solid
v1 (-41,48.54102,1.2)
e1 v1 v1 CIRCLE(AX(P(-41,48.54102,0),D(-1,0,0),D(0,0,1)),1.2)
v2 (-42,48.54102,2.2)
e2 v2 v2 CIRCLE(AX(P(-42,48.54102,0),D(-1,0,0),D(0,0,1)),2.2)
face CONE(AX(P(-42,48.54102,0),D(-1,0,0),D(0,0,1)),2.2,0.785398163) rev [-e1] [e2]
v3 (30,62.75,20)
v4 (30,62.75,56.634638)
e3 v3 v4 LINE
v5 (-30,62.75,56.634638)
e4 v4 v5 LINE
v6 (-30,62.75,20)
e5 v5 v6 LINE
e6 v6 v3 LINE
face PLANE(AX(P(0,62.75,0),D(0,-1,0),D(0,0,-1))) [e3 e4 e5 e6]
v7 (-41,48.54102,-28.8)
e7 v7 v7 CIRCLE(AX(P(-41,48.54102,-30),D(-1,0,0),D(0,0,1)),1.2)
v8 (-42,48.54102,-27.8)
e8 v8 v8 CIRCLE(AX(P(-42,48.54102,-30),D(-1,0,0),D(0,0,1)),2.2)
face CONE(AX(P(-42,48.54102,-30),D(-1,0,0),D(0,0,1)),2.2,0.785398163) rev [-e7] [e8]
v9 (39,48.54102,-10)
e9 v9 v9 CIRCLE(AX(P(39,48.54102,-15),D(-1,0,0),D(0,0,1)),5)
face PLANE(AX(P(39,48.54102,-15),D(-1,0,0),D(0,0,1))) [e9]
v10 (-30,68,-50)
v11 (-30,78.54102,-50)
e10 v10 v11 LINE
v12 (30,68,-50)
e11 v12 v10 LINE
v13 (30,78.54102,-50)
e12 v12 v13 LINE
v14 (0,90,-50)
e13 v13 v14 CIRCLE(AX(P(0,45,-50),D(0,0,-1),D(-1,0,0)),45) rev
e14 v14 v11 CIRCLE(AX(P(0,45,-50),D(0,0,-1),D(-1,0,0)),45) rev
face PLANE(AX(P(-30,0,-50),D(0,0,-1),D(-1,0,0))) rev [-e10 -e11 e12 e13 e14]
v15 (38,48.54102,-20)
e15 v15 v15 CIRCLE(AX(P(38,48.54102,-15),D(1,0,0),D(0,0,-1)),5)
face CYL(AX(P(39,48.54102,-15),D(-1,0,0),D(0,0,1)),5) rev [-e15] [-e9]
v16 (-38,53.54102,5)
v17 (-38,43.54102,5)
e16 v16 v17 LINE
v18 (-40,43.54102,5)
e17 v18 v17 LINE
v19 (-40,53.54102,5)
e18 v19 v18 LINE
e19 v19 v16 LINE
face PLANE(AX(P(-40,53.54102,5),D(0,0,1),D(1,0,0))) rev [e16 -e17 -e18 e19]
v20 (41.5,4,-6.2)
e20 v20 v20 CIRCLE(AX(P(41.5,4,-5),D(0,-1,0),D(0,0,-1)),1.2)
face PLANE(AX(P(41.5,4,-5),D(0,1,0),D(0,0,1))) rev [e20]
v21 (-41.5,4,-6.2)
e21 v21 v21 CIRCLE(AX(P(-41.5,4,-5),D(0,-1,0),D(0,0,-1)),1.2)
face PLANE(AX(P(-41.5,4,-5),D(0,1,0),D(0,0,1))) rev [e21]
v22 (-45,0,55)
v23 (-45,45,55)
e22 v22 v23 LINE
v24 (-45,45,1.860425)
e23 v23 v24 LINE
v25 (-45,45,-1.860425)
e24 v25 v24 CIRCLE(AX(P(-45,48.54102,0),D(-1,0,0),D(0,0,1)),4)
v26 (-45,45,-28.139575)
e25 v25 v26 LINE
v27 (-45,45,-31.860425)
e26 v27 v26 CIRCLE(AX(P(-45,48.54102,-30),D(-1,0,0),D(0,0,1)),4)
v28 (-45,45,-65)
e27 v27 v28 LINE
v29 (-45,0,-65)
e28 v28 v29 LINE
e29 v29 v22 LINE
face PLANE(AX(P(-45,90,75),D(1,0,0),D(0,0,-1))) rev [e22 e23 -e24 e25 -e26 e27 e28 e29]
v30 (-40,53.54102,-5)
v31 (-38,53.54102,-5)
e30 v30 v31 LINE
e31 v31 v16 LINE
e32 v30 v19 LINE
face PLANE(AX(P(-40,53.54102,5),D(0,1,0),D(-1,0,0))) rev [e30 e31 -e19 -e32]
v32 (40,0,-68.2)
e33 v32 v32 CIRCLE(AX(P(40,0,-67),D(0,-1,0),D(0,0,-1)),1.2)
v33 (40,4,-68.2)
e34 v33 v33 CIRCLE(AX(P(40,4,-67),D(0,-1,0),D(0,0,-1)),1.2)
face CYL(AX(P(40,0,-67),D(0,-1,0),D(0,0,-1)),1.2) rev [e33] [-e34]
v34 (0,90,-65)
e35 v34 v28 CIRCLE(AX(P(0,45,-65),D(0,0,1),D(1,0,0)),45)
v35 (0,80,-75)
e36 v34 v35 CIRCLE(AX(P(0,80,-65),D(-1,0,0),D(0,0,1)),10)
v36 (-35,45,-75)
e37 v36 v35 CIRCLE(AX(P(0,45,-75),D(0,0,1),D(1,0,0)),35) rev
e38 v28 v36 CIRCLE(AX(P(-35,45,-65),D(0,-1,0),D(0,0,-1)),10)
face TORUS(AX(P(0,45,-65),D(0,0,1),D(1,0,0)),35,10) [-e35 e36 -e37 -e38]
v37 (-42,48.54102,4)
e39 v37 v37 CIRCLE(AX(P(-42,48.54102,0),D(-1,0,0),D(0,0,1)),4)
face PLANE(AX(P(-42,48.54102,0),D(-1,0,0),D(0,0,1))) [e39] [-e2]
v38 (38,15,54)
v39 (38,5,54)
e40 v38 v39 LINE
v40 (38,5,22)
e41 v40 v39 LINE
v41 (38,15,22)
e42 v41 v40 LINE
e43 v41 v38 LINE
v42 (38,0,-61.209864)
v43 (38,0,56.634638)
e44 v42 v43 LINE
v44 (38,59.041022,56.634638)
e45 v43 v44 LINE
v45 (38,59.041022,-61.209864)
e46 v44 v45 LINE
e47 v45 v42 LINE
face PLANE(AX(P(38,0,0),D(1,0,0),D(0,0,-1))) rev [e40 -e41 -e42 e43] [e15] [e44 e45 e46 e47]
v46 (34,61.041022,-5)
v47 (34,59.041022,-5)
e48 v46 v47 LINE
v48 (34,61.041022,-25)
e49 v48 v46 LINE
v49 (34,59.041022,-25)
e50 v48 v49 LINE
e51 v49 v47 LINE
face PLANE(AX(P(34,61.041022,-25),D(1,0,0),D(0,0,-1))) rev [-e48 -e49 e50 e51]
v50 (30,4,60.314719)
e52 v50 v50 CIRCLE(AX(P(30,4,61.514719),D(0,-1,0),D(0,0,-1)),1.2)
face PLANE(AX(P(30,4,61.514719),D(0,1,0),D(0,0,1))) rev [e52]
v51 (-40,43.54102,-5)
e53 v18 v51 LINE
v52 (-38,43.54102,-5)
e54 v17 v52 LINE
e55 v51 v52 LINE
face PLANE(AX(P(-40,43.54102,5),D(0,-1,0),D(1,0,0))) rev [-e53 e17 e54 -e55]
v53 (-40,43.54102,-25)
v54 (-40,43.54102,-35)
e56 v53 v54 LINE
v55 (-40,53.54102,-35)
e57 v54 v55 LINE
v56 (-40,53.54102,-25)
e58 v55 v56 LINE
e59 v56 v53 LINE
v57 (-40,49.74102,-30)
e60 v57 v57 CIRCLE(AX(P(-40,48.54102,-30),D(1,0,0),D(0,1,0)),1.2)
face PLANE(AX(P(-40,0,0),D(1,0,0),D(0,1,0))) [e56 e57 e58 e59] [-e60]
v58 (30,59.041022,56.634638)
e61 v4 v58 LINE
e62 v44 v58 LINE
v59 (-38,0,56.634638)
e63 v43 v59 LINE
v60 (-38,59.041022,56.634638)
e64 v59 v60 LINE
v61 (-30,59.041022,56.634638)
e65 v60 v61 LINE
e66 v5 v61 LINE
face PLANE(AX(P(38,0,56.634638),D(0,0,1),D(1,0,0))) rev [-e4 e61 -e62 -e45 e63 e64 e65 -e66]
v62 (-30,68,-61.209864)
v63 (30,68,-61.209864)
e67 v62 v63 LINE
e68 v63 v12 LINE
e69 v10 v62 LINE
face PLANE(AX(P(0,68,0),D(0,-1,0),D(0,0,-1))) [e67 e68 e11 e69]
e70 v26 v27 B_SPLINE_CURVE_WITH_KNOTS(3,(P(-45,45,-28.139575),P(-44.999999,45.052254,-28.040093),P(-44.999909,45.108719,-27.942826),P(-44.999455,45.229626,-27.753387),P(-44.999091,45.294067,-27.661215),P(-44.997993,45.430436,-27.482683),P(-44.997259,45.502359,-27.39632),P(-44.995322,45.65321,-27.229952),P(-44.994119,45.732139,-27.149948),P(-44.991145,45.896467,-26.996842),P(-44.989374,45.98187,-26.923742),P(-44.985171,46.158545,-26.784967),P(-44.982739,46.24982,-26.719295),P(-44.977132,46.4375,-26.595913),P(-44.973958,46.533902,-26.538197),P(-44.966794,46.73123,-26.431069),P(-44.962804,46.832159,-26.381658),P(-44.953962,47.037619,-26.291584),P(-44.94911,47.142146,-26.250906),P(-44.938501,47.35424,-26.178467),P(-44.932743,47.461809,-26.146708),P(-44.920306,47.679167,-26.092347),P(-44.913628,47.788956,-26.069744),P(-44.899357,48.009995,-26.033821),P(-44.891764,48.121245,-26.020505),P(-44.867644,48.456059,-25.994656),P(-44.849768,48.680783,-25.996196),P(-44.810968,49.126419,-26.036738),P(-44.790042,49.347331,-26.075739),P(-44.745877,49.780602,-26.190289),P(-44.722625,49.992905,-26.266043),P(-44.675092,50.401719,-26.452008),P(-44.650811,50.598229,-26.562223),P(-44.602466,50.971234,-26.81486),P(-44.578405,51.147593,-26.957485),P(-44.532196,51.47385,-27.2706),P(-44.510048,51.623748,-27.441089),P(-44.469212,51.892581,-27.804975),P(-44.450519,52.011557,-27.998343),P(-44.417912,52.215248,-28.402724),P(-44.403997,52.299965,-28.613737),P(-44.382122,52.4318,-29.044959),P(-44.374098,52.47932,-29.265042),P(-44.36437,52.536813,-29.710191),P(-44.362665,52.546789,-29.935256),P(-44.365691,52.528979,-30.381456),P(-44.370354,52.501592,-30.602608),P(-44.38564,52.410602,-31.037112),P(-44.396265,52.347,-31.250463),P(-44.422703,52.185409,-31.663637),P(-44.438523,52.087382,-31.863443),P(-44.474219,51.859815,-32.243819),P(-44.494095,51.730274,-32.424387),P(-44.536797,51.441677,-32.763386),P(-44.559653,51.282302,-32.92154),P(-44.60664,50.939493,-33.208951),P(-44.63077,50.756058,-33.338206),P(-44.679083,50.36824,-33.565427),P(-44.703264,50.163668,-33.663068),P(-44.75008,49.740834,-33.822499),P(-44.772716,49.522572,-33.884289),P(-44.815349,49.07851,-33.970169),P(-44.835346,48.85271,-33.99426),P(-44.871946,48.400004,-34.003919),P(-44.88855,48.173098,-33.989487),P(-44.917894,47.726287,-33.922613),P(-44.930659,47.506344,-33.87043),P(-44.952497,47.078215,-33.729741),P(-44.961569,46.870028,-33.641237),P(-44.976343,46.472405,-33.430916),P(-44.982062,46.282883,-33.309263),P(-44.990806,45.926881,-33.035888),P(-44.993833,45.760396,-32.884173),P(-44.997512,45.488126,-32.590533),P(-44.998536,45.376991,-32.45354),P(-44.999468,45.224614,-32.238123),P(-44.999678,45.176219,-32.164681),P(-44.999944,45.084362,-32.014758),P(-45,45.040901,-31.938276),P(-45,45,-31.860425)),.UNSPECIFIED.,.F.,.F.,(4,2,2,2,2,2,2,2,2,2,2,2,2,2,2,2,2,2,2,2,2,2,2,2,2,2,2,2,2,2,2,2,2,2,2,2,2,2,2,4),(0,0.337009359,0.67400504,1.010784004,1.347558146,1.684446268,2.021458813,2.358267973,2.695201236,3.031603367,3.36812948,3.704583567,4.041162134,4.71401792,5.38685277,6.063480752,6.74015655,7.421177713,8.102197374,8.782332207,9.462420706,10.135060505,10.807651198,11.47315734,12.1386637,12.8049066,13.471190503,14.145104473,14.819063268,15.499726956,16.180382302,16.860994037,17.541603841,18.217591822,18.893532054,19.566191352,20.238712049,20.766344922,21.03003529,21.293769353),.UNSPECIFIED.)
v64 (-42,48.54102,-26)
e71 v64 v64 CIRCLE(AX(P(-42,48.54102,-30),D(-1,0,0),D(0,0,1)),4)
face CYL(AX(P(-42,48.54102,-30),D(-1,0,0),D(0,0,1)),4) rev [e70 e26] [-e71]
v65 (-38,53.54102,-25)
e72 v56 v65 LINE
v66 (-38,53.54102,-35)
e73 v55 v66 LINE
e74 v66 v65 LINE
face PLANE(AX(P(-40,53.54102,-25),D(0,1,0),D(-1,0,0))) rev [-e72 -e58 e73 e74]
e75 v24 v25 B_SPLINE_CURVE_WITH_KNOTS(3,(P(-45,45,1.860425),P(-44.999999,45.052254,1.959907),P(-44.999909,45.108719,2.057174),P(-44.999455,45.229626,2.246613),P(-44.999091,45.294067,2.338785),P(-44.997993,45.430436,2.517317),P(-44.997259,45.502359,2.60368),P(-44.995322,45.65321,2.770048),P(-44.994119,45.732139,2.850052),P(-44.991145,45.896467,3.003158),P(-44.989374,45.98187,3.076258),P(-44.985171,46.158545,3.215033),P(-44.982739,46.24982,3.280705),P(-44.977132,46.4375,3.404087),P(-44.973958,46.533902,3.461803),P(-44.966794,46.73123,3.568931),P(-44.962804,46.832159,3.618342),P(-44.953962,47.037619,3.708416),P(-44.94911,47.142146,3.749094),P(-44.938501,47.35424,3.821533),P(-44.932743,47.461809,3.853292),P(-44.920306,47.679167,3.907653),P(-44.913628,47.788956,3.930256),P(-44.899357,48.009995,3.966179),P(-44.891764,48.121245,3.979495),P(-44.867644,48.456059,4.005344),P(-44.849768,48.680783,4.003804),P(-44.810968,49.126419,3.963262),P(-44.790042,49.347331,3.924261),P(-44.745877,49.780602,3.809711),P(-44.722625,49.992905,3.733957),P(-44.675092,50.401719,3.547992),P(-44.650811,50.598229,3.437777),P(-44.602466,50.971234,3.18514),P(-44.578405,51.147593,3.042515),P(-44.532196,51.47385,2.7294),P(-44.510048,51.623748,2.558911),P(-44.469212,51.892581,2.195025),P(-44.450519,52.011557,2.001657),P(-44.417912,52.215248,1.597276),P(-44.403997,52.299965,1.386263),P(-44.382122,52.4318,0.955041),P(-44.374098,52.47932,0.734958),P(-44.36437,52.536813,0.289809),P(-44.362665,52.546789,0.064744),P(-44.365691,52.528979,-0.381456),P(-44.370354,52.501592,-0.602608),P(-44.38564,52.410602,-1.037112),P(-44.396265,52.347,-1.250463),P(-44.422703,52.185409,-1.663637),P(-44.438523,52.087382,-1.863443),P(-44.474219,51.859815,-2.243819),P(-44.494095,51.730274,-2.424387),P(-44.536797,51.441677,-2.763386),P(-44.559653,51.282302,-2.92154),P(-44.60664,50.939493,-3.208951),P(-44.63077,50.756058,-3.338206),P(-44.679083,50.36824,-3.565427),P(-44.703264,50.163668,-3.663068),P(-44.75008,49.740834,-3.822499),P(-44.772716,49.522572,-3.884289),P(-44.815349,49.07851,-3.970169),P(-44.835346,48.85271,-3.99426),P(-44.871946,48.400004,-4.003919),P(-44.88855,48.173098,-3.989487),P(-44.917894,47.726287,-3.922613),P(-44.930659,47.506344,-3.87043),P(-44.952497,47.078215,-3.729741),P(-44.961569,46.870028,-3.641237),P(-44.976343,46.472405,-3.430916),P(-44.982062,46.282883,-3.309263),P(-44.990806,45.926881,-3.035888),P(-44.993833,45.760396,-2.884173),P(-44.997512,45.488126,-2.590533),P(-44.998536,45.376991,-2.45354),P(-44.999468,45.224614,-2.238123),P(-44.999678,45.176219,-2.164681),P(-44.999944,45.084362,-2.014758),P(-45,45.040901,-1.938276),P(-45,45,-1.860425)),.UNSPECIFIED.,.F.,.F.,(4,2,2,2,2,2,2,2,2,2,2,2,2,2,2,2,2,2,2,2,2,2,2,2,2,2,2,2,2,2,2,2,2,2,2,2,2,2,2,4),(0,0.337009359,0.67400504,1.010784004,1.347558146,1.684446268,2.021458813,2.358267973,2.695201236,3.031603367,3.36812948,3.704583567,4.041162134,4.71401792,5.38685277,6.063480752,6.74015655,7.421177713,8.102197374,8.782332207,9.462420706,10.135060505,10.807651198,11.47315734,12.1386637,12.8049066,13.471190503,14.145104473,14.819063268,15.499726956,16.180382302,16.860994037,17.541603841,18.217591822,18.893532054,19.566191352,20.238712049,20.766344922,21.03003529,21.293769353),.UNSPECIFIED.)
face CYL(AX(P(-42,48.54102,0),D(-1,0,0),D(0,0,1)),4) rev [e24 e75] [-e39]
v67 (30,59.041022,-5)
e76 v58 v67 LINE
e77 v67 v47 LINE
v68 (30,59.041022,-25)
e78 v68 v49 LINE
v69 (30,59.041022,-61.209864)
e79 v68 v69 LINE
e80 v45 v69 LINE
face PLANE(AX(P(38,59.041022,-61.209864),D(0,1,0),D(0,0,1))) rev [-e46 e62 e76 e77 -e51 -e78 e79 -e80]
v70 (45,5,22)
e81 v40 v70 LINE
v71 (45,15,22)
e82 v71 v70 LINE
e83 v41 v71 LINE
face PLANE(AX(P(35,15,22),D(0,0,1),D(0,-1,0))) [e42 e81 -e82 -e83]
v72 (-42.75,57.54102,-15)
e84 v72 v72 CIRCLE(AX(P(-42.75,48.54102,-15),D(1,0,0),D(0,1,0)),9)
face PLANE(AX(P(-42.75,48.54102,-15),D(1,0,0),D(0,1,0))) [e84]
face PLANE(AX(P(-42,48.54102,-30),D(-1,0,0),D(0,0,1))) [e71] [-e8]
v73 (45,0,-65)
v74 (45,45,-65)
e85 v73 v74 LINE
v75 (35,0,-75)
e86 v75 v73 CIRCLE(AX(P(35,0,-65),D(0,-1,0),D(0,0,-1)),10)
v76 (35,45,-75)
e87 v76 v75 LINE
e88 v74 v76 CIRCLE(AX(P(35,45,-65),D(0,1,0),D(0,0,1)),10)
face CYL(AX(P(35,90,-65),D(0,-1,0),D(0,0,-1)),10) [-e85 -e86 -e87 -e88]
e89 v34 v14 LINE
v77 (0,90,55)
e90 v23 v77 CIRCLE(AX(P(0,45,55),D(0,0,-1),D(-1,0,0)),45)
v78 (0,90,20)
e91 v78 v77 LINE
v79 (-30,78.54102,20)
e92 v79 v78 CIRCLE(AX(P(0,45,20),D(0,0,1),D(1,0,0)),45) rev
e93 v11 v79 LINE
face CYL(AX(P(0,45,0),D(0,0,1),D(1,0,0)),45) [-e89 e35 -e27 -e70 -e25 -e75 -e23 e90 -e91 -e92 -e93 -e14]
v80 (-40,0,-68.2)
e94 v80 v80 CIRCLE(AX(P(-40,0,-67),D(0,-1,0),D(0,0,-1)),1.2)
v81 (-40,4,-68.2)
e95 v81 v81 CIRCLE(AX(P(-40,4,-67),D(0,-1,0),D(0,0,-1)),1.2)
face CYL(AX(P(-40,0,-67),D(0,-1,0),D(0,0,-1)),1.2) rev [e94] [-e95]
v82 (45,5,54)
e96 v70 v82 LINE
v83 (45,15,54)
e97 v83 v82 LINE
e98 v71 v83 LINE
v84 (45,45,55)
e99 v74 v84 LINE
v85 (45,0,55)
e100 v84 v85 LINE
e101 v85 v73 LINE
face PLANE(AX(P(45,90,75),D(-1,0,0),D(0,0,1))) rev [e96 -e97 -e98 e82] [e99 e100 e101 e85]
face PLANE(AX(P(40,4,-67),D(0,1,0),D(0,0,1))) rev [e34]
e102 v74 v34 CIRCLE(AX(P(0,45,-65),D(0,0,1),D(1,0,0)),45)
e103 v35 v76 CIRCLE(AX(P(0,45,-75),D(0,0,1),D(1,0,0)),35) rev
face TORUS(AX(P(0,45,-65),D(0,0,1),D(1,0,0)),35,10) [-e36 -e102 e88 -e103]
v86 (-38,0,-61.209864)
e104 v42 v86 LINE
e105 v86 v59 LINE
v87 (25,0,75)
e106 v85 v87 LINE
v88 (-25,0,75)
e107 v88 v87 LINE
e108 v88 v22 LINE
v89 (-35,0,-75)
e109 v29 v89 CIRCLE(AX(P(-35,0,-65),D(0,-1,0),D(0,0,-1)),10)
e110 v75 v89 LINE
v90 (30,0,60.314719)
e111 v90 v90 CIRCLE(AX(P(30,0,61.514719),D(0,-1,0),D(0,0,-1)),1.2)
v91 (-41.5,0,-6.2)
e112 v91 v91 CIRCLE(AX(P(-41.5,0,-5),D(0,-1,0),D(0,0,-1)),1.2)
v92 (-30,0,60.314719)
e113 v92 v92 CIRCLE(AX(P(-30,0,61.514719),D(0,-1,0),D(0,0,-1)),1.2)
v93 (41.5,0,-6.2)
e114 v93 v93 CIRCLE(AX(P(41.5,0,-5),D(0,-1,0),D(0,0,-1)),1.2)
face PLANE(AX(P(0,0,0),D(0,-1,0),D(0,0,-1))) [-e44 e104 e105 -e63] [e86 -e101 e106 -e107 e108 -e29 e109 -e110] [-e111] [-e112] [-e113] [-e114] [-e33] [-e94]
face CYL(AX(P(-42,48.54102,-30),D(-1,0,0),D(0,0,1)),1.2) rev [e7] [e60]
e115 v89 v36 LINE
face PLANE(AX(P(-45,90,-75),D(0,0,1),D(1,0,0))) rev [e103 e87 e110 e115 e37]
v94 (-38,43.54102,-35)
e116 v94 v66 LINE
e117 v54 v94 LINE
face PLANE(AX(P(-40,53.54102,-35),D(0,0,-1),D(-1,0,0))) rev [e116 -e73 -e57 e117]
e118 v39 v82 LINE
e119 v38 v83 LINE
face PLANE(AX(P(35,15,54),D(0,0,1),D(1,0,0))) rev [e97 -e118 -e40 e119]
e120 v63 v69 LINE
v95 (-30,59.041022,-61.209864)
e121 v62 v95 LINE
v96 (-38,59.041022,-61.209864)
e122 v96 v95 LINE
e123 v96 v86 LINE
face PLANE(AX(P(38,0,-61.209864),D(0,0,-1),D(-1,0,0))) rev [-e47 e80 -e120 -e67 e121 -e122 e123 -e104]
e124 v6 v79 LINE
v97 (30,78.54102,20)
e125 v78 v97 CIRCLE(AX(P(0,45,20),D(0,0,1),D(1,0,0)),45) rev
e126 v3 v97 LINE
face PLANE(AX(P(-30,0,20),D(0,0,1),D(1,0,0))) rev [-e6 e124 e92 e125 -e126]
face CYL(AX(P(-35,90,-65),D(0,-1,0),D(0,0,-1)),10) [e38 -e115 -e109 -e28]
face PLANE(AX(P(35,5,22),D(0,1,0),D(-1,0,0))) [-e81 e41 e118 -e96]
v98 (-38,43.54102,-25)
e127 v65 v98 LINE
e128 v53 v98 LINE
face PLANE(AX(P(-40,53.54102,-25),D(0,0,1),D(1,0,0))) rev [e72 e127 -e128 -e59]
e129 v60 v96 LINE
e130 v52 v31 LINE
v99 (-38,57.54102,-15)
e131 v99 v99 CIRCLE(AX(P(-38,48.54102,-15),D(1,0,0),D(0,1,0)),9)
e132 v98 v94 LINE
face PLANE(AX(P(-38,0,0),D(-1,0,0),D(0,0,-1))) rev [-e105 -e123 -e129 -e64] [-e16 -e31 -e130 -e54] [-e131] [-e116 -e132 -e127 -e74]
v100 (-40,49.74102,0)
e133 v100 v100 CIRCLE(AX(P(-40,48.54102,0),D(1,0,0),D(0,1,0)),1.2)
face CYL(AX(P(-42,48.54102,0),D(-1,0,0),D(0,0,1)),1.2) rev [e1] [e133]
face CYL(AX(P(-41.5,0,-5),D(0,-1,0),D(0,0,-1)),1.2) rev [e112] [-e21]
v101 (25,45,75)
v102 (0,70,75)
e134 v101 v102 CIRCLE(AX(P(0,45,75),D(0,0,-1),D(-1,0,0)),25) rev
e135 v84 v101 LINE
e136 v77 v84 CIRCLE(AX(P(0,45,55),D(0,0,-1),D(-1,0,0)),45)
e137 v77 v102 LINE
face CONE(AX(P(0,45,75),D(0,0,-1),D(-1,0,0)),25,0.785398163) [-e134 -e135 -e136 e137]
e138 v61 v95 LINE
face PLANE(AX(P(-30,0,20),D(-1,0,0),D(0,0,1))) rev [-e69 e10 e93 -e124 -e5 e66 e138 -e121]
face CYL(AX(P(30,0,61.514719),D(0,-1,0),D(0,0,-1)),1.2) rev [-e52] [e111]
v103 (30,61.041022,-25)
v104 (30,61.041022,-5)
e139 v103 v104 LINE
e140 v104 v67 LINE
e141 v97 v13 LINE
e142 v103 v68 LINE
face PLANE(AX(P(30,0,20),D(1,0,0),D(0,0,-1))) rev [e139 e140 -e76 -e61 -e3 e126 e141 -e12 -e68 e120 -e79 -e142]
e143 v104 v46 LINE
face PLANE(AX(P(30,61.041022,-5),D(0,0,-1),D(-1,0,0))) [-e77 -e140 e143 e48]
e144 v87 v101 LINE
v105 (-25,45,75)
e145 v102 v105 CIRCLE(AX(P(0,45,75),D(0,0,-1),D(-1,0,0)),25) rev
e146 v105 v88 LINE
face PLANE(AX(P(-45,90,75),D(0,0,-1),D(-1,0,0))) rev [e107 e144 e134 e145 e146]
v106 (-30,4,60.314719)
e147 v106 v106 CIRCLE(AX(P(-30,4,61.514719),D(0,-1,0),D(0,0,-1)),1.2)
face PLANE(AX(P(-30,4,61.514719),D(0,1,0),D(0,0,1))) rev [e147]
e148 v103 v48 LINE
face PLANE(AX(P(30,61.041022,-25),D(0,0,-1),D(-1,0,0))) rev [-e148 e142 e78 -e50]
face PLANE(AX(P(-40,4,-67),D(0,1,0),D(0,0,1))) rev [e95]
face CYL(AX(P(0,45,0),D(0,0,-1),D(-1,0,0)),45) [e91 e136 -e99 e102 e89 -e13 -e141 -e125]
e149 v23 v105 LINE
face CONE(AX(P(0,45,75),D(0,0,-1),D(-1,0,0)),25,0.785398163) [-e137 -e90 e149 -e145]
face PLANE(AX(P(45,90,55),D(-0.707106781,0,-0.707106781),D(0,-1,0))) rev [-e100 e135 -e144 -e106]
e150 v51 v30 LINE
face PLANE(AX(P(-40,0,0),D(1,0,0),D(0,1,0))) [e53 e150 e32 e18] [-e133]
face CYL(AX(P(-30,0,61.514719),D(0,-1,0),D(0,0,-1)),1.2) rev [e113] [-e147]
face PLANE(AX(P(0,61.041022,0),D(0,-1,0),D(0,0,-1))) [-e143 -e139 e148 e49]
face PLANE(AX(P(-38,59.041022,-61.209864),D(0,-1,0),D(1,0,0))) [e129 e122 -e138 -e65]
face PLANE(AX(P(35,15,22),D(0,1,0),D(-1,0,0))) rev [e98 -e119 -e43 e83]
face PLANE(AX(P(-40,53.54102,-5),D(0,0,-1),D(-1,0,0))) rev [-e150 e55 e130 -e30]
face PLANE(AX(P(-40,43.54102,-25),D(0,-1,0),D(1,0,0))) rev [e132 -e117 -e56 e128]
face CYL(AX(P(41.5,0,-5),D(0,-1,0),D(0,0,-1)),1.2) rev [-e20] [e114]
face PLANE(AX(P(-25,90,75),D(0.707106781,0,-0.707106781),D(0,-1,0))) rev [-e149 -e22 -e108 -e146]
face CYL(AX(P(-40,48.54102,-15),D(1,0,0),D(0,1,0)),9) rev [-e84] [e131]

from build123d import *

# Parameters (mm, degrees)
SCHIZZO1_W                             = 90
SCHIZZO1_H                             = 150
ESTRUSIONE_ESTRUSIONE1_DEPTH           = 90
SCHIZZO4_W                             = 60
SCHIZZO4_H                             = 70
TAGLIO_ESTRUSIONE2_DEPTH               = 90
RACCORDO5_R                            = 45
RACCORDO6_R                            = 45
SMUSSO2_SIZE                           = 20
SCHIZZO7_W                             = 50
SCHIZZO7_H                             = 44.753189799
ESTRUSIONE_ESTRUSIONE2_DEPTH           = 50
SMUSSO3_SIZE                           = 20
SMUSSO3_SIZE2                          = 34.641016151
RACCORDO7_R                            = 10
RACCORDO8_R                            = 10
SCHIZZO9_W                             = 50
SCHIZZO9_H                             = 50
ESTRUSIONE_ESTRUSIONE3_DEPTH           = 5
RACCORDO9_R                            = 10
SCHIZZO13_W                            = 45
SCHIZZO13_H                            = 38.415996799
TAGLIO_ESTRUSIONE3_DEPTH               = 79.978264331
SCHIZZO14_W                            = 117.844501366
SCHIZZO14_H                            = 59.041021869
TAGLIO_ESTRUSIONE4_DEPTH               = 8
SCHIZZO18_R                            = 5
TAGLIO_ESTRUSIONE5_DEPTH               = 9
SCHIZZO16_W                            = 4
SCHIZZO16_H                            = 20
TAGLIO_ESTRUSIONE7_DEPTH               = 2
SCHIZZO23_W                            = 76
SCHIZZO23_H                            = 117.844501366
TAGLIO_ESTRUSIONE8_DEPTH               = 38
FORO_PER_VITE_M2_2_D                   = 2.4
FORO_PER_VITE_M2_2_DEPTH               = 4
FORO_PER_VITE_M4_1_D                   = 4.5
FORO_PER_VITE_M4_1_DEPTH               = 10
SCHIZZO29_W                            = 60
SCHIZZO29_H                            = 11.209863528
TAGLIO_ESTRUSIONE9_DEPTH               = 30
SCHIZZO36_W                            = 46.07976418
SCHIZZO36_H                            = 28.262497783
TAGLIO_ESTRUSIONE12_DEPTH              = 28
ESTRUSIONE_ESTRUSIONE4_REACH           = 170.388
SCHIZZO38_R                            = 6
SCHIZZO38_R_2                          = 2.5
TAGLIO_ESTRUSIONE13_DEPTH              = 28
SCHIZZO39_R                            = 9
SCHIZZO39_W                            = 10
SCHIZZO39_H                            = 10
TAGLIO_ESTRUSIONE14_DEPTH              = 2
SCHIZZO40_W                            = 32
SCHIZZO40_H                            = 10
TAGLIO_ESTRUSIONE15_DEPTH              = 10
SCHIZZO42_R                            = 4
TAGLIO_ESTRUSIONE16_DEPTH              = 3
FORO_SVASATO_PER_VITE_M2_3_D           = 2.4
FORO_SVASATO_PER_VITE_M2_3_DEPTH       = 6
FORO_SVASATO_PER_VITE_M2_3_CSINK_D     = 4.4
FORO_SVASATO_PER_VITE_M2_3_CSINK_ANGLE = 90
FORO_SVASATO_PER_VITE_M2_3_TIP         = 0.721032743
SCHIZZO53_R                            = 9
TAGLIO_ESTRUSIONE19_DEPTH              = 2.75
SCHIZZO54_W                            = 60
SCHIZZO54_H                            = 36.634637838
TAGLIO_ESTRUSIONE20_DEPTH              = 24.75
SCHIZZO55_W                            = 50
SCHIZZO55_H                            = 69.198351347
TAGLIO_ESTRUSIONE21_DEPTH              = 66
SCHIZZO57_W                            = 18.365362162
SCHIZZO57_H                            = 38.415996799
ESTRUSIONE_ESTRUSIONE5_DEPTH           = 47
SCHIZZO58_W                            = 7
SCHIZZO58_H                            = 32
ESTRUSIONE_ESTRUSIONE6_DEPTH           = 11


with BuildPart() as part:
    # Schizzo1 → Estrusione-Estrusione1 (new body)
    with BuildSketch(Plane(origin=(0, 0, 0), x_dir=(1, 0, 0), z_dir=(0, 1, 0))):
        Rectangle(SCHIZZO1_W, SCHIZZO1_H)
    extrude(amount=ESTRUSIONE_ESTRUSIONE1_DEPTH)

    # Schizzo4 → Taglio-Estrusione2 (cut)
    with BuildSketch(Plane(origin=(0, 90, 0), x_dir=(1, 0, 0), z_dir=(0, 1, 0))):
        with Locations((0, 15)):
            Rectangle(SCHIZZO4_W, SCHIZZO4_H)
    extrude(amount=-TAGLIO_ESTRUSIONE2_DEPTH, mode=Mode.SUBTRACT)

    # Raccordo5
    # the kernel refuses this fillet: 45 mm, written as the material it takes off along each edge
    with BuildSketch(Plane(origin=(-45, 90, -187.5), x_dir=(0, -1, 0), z_dir=(0, 0, 1))) as raccordo5_piece_1:
        with BuildLine():
            CenterArc((RACCORDO5_R, RACCORDO5_R), RACCORDO5_R, 180, 90)
            Line((0, RACCORDO5_R), (0, 0))
            Line((0, 0), (RACCORDO5_R, 0))
        make_face()
    extrude(amount=375, mode=Mode.SUBTRACT)

    # Raccordo6
    # the kernel refuses this fillet: 45 mm, written as the material it takes off along each edge
    with BuildSketch(Plane(origin=(45, 90, 187.5), x_dir=(0, -1, 0), z_dir=(0, 0, -1))) as raccordo6_piece_1:
        with BuildLine():
            CenterArc((RACCORDO6_R, RACCORDO6_R), RACCORDO6_R, 180, 90)
            Line((0, RACCORDO6_R), (0, 0))
            Line((0, 0), (RACCORDO6_R, 0))
        make_face()
    extrude(amount=375, mode=Mode.SUBTRACT)

    # Smusso2
    smusso2_edges = [part.edges().sort_by_distance(p)[0] for p in [
        (-45, 22.5, 75),
        (0, 90, 75),
        (45, 22.5, 75),
        (0, 90, 75),
    ]]
    chamfer(smusso2_edges, length=SMUSSO2_SIZE)

    # Schizzo7 → Estrusione-Estrusione2 (add)
    with BuildSketch(Plane.XY.offset(75)):
        with Locations((0, 22.3765949)):
            Rectangle(SCHIZZO7_W, SCHIZZO7_H)
    extrude(amount=ESTRUSIONE_ESTRUSIONE2_DEPTH)

    # Smusso3
    smusso3_edges = [part.edges().sort_by_distance(p)[0] for p in [
        (0, 44.753189799, 125),
    ]]
    smusso3_side = [part.faces().sort_by_distance(p)[0] for p in [
        (0, 44.753189799, 100),
    ]]
    chamfer(smusso3_edges, length=SMUSSO3_SIZE, length2=SMUSSO3_SIZE2, reference=smusso3_side[0])

    # Raccordo7
    raccordo7_edges = [part.edges().sort_by_distance(p)[0] for p in [
        (0, 44.753189799, 105),
    ]]
    fillet(raccordo7_edges, radius=RACCORDO7_R)

    # Raccordo8
    raccordo8_edges = [part.edges().sort_by_distance(p)[0] for p in [
        (0, 10.112173648, 125),
    ]]
    fillet(raccordo8_edges, radius=RACCORDO8_R)

    # Schizzo9 → Estrusione-Estrusione3 (add)
    with BuildSketch(Plane.XZ):
        with Locations((0, 100)):
            Rectangle(SCHIZZO9_W, SCHIZZO9_H)
    extrude(amount=ESTRUSIONE_ESTRUSIONE3_DEPTH)

    # Raccordo9
    raccordo9_edges = [part.edges().sort_by_distance(p)[0] for p in [
        (-45, 22.5, -75),
        (0, 90, -75),
        (45, 22.5, -75),
        (0, 90, -75),
    ]]
    fillet(raccordo9_edges, radius=RACCORDO9_R)

    # Schizzo13 → Taglio-Estrusione3 (cut)
    with BuildSketch(Plane(origin=(0, 0, 20), x_dir=(-1, 0, 0), z_dir=(0, 0, -1))):
        with Locations((0, 19.2079984)):
            Rectangle(SCHIZZO13_W, SCHIZZO13_H)
    extrude(amount=-TAGLIO_ESTRUSIONE3_DEPTH, mode=Mode.SUBTRACT)

    # Schizzo14 → Taglio-Estrusione4 (cut)
    with BuildSketch(Plane.ZY.offset(-30)):
        with Locations((-2.287612845, 29.520510935)):
            Rectangle(SCHIZZO14_W, SCHIZZO14_H)
    taglio_estrusione4 = extrude(amount=-TAGLIO_ESTRUSIONE4_DEPTH, mode=Mode.SUBTRACT)

    # Specchia1: Taglio-Estrusione4 across plane
    add(taglio_estrusione4.mirror(Plane(origin=(0, 0, 0), x_dir=(0, 0, 1), z_dir=(1, 0, 0))), mode=Mode.SUBTRACT)

    # Schizzo18 → Taglio-Estrusione5 (cut)
    with BuildSketch(Plane.ZY.offset(-30)):
        with Locations((-15, 48.541019662)):
            Circle(SCHIZZO18_R)
    extrude(amount=-TAGLIO_ESTRUSIONE5_DEPTH, mode=Mode.SUBTRACT)

    # Schizzo16 → Taglio-Estrusione7 (cut)
    with BuildSketch(Plane.XZ.offset(-59.041021869)):
        with Locations((32, -15)):
            Rectangle(SCHIZZO16_W, SCHIZZO16_H)
    extrude(amount=-TAGLIO_ESTRUSIONE7_DEPTH, mode=Mode.SUBTRACT)

    # Schizzo23 → Taglio-Estrusione8 (cut)
    with BuildSketch(Plane.XZ):
        with Locations((0, -2.287612845)):
            Rectangle(SCHIZZO23_W, SCHIZZO23_H)
    extrude(amount=-TAGLIO_ESTRUSIONE8_DEPTH, mode=Mode.SUBTRACT)

    # Foro per Vite M2-2
    with Locations(Plane(origin=(0, 0, 0), x_dir=(-1, 0, 0), z_dir=(0, -1, 0))):
        with Locations((40, 67), (30, -61.514718626), (-30, -61.514718626), (-40, 67), (-41.5, 5), (41.5, 5)):
            Hole(FORO_PER_VITE_M2_2_D / 2, depth=FORO_PER_VITE_M2_2_DEPTH)

    # Foro per Vite M4-1
    with Locations(Plane(origin=(0, -5, 84.779580177), x_dir=(0, 0, -1), z_dir=(0, -1, 0))):
        with Locations((0, 0)):
            Hole(FORO_PER_VITE_M4_1_D / 2, depth=FORO_PER_VITE_M4_1_DEPTH)

    # Schizzo29 → Taglio-Estrusione9 (cut)
    with BuildSketch(Plane.XZ.offset(-38)):
        with Locations((0, -55.604931764)):
            Rectangle(SCHIZZO29_W, SCHIZZO29_H)
    extrude(amount=-TAGLIO_ESTRUSIONE9_DEPTH, mode=Mode.SUBTRACT)

    # Schizzo36 → Taglio-Estrusione12 (cut)
    with BuildSketch(Plane(origin=(0, 56.654631148, 98.128699633), x_dir=(1, 0, 0), z_dir=(0, 0.5000000000000012, 0.8660254037844378))):
        with Locations((0, -35.289606117)):
            Rectangle(SCHIZZO36_W, SCHIZZO36_H)
    extrude(amount=-TAGLIO_ESTRUSIONE12_DEPTH, mode=Mode.SUBTRACT)

    # Schizzo37 → Estrusione-Estrusione4 (add, up to next)
    with BuildSketch(Plane.ZY.offset(-23.03988209), mode=Mode.PRIVATE) as estrusione_estrusione4_sk1:
        Polygon((122.839127138, 13.854915234), (108.707878246, 38.330956288), (106.809101084, 37.234696782), (120.940349975, 12.758655728), align=None)
    estrusione_estrusione4_tool1 = extrude(estrusione_estrusione4_sk1.sketch, amount=ESTRUSIONE_ESTRUSIONE4_REACH, mode=Mode.PRIVATE) - part.part
    add(estrusione_estrusione4_tool1.solids().sort_by_distance((23.039882, 25.544806, 114.824114))[0])

    # Schizzo38 → Taglio-Estrusione13 (cut)
    with BuildSketch(Plane(origin=(0, 56.654631148, 98.128699633), x_dir=(1, 0, 0), z_dir=(0, 0.5000000000000013, 0.8660254037844379))):
        with Locations(Location((-12.5, -35.289606117, 0), (0, 0, 270))):
            Circle(SCHIZZO38_R)
        with Locations(Location((12.5, -35.289606117, 0), (0, 0, 270))):
            Circle(SCHIZZO38_R_2)
    extrude(amount=-TAGLIO_ESTRUSIONE13_DEPTH, mode=Mode.SUBTRACT)

    # Schizzo39 → Taglio-Estrusione14 (cut)
    with BuildSketch(Plane(origin=(-38, 0, 0), x_dir=(0, 0, -1), z_dir=(1, 0, 0))):
        with Locations(Location((15, 48.541019662, 0), (0, 0, 90))):
            Circle(SCHIZZO39_R)
        with Locations((0, 48.541019662)):
            Rectangle(SCHIZZO39_W, SCHIZZO39_H)
        with Locations((30, 48.541019662)):
            Rectangle(SCHIZZO39_W, SCHIZZO39_H)
    extrude(amount=-TAGLIO_ESTRUSIONE14_DEPTH, mode=Mode.SUBTRACT)

    # Schizzo40 → Taglio-Estrusione15 (cut)
    with BuildSketch(Plane.ZY.offset(45)):
        with Locations((38, 10)):
            Rectangle(SCHIZZO40_W, SCHIZZO40_H)
    taglio_estrusione15 = extrude(amount=-TAGLIO_ESTRUSIONE15_DEPTH, mode=Mode.SUBTRACT)

    # Schizzo42 → Taglio-Estrusione16 (cut)
    with BuildSketch(Plane.ZY.offset(45)):
        with Locations((-30, 48.541019662)):
            Circle(SCHIZZO42_R)
        with Locations((0, 48.541019662)):
            Circle(SCHIZZO42_R)
    extrude(amount=-TAGLIO_ESTRUSIONE16_DEPTH, mode=Mode.SUBTRACT)

    # Foro svasato per Vite M2-3
    with Locations(Plane.ZY.offset(42)):
        with Locations((-30, 48.541019662), (0, 48.541019662)):
            CounterSinkHole(FORO_SVASATO_PER_VITE_M2_3_D / 2, FORO_SVASATO_PER_VITE_M2_3_CSINK_D / 2, depth=FORO_SVASATO_PER_VITE_M2_3_DEPTH, counter_sink_angle=FORO_SVASATO_PER_VITE_M2_3_CSINK_ANGLE)
            with Locations((0, 0, -(FORO_SVASATO_PER_VITE_M2_3_DEPTH + FORO_SVASATO_PER_VITE_M2_3_TIP / 2))):  # 118° drill point
                Cone(0, FORO_SVASATO_PER_VITE_M2_3_D / 2, FORO_SVASATO_PER_VITE_M2_3_TIP, mode=Mode.SUBTRACT)

    # Schizzo53 → Taglio-Estrusione19 (cut)
    with BuildSketch(Plane(origin=(-40, 0, 0), x_dir=(0, 0, -1), z_dir=(1, 0, 0))):
        with Locations(Location((15, 48.541019662, 0), (0, 0, 90))):
            Circle(SCHIZZO53_R)
    extrude(amount=-TAGLIO_ESTRUSIONE19_DEPTH, mode=Mode.SUBTRACT)

    # Schizzo54 → Taglio-Estrusione20 (cut)
    with BuildSketch(Plane.XZ.offset(-38)):
        with Locations((0, 38.317318919)):
            Rectangle(SCHIZZO54_W, SCHIZZO54_H)
    extrude(amount=-TAGLIO_ESTRUSIONE20_DEPTH, mode=Mode.SUBTRACT)

    # Schizzo55 → Taglio-Estrusione21 (cut)
    with BuildSketch(Plane(origin=(0, 44.753189799, 0), x_dir=(1, 0, 0), z_dir=(0, 1, 0))):
        with Locations((0, -109.599175673)):
            Rectangle(SCHIZZO55_W, SCHIZZO55_H)
    extrude(amount=-TAGLIO_ESTRUSIONE21_DEPTH, mode=Mode.SUBTRACT)

    # Schizzo57 → Estrusione-Estrusione5 (add)
    with BuildSketch(Plane(origin=(-22.5, 0, 0), x_dir=(0, 0, -1), z_dir=(1, 0, 0))):
        with Locations((-65.817318919, 19.2079984)):
            Rectangle(SCHIZZO57_W, SCHIZZO57_H)
    extrude(amount=ESTRUSIONE_ESTRUSIONE5_DEPTH)

    # Specchia2: Taglio-Estrusione15 across plane
    add(taglio_estrusione15.mirror(Plane(origin=(0, 0, 0), x_dir=(0, 0, 1), z_dir=(1, 0, 0))), mode=Mode.SUBTRACT)

    # Schizzo58 → Estrusione-Estrusione6 (add)
    with BuildSketch(Plane.XZ.offset(-15)):
        with Locations((-41.5, 38)):
            Rectangle(SCHIZZO58_W, SCHIZZO58_H)
    extrude(amount=ESTRUSIONE_ESTRUSIONE6_DEPTH)


solid = part.part
